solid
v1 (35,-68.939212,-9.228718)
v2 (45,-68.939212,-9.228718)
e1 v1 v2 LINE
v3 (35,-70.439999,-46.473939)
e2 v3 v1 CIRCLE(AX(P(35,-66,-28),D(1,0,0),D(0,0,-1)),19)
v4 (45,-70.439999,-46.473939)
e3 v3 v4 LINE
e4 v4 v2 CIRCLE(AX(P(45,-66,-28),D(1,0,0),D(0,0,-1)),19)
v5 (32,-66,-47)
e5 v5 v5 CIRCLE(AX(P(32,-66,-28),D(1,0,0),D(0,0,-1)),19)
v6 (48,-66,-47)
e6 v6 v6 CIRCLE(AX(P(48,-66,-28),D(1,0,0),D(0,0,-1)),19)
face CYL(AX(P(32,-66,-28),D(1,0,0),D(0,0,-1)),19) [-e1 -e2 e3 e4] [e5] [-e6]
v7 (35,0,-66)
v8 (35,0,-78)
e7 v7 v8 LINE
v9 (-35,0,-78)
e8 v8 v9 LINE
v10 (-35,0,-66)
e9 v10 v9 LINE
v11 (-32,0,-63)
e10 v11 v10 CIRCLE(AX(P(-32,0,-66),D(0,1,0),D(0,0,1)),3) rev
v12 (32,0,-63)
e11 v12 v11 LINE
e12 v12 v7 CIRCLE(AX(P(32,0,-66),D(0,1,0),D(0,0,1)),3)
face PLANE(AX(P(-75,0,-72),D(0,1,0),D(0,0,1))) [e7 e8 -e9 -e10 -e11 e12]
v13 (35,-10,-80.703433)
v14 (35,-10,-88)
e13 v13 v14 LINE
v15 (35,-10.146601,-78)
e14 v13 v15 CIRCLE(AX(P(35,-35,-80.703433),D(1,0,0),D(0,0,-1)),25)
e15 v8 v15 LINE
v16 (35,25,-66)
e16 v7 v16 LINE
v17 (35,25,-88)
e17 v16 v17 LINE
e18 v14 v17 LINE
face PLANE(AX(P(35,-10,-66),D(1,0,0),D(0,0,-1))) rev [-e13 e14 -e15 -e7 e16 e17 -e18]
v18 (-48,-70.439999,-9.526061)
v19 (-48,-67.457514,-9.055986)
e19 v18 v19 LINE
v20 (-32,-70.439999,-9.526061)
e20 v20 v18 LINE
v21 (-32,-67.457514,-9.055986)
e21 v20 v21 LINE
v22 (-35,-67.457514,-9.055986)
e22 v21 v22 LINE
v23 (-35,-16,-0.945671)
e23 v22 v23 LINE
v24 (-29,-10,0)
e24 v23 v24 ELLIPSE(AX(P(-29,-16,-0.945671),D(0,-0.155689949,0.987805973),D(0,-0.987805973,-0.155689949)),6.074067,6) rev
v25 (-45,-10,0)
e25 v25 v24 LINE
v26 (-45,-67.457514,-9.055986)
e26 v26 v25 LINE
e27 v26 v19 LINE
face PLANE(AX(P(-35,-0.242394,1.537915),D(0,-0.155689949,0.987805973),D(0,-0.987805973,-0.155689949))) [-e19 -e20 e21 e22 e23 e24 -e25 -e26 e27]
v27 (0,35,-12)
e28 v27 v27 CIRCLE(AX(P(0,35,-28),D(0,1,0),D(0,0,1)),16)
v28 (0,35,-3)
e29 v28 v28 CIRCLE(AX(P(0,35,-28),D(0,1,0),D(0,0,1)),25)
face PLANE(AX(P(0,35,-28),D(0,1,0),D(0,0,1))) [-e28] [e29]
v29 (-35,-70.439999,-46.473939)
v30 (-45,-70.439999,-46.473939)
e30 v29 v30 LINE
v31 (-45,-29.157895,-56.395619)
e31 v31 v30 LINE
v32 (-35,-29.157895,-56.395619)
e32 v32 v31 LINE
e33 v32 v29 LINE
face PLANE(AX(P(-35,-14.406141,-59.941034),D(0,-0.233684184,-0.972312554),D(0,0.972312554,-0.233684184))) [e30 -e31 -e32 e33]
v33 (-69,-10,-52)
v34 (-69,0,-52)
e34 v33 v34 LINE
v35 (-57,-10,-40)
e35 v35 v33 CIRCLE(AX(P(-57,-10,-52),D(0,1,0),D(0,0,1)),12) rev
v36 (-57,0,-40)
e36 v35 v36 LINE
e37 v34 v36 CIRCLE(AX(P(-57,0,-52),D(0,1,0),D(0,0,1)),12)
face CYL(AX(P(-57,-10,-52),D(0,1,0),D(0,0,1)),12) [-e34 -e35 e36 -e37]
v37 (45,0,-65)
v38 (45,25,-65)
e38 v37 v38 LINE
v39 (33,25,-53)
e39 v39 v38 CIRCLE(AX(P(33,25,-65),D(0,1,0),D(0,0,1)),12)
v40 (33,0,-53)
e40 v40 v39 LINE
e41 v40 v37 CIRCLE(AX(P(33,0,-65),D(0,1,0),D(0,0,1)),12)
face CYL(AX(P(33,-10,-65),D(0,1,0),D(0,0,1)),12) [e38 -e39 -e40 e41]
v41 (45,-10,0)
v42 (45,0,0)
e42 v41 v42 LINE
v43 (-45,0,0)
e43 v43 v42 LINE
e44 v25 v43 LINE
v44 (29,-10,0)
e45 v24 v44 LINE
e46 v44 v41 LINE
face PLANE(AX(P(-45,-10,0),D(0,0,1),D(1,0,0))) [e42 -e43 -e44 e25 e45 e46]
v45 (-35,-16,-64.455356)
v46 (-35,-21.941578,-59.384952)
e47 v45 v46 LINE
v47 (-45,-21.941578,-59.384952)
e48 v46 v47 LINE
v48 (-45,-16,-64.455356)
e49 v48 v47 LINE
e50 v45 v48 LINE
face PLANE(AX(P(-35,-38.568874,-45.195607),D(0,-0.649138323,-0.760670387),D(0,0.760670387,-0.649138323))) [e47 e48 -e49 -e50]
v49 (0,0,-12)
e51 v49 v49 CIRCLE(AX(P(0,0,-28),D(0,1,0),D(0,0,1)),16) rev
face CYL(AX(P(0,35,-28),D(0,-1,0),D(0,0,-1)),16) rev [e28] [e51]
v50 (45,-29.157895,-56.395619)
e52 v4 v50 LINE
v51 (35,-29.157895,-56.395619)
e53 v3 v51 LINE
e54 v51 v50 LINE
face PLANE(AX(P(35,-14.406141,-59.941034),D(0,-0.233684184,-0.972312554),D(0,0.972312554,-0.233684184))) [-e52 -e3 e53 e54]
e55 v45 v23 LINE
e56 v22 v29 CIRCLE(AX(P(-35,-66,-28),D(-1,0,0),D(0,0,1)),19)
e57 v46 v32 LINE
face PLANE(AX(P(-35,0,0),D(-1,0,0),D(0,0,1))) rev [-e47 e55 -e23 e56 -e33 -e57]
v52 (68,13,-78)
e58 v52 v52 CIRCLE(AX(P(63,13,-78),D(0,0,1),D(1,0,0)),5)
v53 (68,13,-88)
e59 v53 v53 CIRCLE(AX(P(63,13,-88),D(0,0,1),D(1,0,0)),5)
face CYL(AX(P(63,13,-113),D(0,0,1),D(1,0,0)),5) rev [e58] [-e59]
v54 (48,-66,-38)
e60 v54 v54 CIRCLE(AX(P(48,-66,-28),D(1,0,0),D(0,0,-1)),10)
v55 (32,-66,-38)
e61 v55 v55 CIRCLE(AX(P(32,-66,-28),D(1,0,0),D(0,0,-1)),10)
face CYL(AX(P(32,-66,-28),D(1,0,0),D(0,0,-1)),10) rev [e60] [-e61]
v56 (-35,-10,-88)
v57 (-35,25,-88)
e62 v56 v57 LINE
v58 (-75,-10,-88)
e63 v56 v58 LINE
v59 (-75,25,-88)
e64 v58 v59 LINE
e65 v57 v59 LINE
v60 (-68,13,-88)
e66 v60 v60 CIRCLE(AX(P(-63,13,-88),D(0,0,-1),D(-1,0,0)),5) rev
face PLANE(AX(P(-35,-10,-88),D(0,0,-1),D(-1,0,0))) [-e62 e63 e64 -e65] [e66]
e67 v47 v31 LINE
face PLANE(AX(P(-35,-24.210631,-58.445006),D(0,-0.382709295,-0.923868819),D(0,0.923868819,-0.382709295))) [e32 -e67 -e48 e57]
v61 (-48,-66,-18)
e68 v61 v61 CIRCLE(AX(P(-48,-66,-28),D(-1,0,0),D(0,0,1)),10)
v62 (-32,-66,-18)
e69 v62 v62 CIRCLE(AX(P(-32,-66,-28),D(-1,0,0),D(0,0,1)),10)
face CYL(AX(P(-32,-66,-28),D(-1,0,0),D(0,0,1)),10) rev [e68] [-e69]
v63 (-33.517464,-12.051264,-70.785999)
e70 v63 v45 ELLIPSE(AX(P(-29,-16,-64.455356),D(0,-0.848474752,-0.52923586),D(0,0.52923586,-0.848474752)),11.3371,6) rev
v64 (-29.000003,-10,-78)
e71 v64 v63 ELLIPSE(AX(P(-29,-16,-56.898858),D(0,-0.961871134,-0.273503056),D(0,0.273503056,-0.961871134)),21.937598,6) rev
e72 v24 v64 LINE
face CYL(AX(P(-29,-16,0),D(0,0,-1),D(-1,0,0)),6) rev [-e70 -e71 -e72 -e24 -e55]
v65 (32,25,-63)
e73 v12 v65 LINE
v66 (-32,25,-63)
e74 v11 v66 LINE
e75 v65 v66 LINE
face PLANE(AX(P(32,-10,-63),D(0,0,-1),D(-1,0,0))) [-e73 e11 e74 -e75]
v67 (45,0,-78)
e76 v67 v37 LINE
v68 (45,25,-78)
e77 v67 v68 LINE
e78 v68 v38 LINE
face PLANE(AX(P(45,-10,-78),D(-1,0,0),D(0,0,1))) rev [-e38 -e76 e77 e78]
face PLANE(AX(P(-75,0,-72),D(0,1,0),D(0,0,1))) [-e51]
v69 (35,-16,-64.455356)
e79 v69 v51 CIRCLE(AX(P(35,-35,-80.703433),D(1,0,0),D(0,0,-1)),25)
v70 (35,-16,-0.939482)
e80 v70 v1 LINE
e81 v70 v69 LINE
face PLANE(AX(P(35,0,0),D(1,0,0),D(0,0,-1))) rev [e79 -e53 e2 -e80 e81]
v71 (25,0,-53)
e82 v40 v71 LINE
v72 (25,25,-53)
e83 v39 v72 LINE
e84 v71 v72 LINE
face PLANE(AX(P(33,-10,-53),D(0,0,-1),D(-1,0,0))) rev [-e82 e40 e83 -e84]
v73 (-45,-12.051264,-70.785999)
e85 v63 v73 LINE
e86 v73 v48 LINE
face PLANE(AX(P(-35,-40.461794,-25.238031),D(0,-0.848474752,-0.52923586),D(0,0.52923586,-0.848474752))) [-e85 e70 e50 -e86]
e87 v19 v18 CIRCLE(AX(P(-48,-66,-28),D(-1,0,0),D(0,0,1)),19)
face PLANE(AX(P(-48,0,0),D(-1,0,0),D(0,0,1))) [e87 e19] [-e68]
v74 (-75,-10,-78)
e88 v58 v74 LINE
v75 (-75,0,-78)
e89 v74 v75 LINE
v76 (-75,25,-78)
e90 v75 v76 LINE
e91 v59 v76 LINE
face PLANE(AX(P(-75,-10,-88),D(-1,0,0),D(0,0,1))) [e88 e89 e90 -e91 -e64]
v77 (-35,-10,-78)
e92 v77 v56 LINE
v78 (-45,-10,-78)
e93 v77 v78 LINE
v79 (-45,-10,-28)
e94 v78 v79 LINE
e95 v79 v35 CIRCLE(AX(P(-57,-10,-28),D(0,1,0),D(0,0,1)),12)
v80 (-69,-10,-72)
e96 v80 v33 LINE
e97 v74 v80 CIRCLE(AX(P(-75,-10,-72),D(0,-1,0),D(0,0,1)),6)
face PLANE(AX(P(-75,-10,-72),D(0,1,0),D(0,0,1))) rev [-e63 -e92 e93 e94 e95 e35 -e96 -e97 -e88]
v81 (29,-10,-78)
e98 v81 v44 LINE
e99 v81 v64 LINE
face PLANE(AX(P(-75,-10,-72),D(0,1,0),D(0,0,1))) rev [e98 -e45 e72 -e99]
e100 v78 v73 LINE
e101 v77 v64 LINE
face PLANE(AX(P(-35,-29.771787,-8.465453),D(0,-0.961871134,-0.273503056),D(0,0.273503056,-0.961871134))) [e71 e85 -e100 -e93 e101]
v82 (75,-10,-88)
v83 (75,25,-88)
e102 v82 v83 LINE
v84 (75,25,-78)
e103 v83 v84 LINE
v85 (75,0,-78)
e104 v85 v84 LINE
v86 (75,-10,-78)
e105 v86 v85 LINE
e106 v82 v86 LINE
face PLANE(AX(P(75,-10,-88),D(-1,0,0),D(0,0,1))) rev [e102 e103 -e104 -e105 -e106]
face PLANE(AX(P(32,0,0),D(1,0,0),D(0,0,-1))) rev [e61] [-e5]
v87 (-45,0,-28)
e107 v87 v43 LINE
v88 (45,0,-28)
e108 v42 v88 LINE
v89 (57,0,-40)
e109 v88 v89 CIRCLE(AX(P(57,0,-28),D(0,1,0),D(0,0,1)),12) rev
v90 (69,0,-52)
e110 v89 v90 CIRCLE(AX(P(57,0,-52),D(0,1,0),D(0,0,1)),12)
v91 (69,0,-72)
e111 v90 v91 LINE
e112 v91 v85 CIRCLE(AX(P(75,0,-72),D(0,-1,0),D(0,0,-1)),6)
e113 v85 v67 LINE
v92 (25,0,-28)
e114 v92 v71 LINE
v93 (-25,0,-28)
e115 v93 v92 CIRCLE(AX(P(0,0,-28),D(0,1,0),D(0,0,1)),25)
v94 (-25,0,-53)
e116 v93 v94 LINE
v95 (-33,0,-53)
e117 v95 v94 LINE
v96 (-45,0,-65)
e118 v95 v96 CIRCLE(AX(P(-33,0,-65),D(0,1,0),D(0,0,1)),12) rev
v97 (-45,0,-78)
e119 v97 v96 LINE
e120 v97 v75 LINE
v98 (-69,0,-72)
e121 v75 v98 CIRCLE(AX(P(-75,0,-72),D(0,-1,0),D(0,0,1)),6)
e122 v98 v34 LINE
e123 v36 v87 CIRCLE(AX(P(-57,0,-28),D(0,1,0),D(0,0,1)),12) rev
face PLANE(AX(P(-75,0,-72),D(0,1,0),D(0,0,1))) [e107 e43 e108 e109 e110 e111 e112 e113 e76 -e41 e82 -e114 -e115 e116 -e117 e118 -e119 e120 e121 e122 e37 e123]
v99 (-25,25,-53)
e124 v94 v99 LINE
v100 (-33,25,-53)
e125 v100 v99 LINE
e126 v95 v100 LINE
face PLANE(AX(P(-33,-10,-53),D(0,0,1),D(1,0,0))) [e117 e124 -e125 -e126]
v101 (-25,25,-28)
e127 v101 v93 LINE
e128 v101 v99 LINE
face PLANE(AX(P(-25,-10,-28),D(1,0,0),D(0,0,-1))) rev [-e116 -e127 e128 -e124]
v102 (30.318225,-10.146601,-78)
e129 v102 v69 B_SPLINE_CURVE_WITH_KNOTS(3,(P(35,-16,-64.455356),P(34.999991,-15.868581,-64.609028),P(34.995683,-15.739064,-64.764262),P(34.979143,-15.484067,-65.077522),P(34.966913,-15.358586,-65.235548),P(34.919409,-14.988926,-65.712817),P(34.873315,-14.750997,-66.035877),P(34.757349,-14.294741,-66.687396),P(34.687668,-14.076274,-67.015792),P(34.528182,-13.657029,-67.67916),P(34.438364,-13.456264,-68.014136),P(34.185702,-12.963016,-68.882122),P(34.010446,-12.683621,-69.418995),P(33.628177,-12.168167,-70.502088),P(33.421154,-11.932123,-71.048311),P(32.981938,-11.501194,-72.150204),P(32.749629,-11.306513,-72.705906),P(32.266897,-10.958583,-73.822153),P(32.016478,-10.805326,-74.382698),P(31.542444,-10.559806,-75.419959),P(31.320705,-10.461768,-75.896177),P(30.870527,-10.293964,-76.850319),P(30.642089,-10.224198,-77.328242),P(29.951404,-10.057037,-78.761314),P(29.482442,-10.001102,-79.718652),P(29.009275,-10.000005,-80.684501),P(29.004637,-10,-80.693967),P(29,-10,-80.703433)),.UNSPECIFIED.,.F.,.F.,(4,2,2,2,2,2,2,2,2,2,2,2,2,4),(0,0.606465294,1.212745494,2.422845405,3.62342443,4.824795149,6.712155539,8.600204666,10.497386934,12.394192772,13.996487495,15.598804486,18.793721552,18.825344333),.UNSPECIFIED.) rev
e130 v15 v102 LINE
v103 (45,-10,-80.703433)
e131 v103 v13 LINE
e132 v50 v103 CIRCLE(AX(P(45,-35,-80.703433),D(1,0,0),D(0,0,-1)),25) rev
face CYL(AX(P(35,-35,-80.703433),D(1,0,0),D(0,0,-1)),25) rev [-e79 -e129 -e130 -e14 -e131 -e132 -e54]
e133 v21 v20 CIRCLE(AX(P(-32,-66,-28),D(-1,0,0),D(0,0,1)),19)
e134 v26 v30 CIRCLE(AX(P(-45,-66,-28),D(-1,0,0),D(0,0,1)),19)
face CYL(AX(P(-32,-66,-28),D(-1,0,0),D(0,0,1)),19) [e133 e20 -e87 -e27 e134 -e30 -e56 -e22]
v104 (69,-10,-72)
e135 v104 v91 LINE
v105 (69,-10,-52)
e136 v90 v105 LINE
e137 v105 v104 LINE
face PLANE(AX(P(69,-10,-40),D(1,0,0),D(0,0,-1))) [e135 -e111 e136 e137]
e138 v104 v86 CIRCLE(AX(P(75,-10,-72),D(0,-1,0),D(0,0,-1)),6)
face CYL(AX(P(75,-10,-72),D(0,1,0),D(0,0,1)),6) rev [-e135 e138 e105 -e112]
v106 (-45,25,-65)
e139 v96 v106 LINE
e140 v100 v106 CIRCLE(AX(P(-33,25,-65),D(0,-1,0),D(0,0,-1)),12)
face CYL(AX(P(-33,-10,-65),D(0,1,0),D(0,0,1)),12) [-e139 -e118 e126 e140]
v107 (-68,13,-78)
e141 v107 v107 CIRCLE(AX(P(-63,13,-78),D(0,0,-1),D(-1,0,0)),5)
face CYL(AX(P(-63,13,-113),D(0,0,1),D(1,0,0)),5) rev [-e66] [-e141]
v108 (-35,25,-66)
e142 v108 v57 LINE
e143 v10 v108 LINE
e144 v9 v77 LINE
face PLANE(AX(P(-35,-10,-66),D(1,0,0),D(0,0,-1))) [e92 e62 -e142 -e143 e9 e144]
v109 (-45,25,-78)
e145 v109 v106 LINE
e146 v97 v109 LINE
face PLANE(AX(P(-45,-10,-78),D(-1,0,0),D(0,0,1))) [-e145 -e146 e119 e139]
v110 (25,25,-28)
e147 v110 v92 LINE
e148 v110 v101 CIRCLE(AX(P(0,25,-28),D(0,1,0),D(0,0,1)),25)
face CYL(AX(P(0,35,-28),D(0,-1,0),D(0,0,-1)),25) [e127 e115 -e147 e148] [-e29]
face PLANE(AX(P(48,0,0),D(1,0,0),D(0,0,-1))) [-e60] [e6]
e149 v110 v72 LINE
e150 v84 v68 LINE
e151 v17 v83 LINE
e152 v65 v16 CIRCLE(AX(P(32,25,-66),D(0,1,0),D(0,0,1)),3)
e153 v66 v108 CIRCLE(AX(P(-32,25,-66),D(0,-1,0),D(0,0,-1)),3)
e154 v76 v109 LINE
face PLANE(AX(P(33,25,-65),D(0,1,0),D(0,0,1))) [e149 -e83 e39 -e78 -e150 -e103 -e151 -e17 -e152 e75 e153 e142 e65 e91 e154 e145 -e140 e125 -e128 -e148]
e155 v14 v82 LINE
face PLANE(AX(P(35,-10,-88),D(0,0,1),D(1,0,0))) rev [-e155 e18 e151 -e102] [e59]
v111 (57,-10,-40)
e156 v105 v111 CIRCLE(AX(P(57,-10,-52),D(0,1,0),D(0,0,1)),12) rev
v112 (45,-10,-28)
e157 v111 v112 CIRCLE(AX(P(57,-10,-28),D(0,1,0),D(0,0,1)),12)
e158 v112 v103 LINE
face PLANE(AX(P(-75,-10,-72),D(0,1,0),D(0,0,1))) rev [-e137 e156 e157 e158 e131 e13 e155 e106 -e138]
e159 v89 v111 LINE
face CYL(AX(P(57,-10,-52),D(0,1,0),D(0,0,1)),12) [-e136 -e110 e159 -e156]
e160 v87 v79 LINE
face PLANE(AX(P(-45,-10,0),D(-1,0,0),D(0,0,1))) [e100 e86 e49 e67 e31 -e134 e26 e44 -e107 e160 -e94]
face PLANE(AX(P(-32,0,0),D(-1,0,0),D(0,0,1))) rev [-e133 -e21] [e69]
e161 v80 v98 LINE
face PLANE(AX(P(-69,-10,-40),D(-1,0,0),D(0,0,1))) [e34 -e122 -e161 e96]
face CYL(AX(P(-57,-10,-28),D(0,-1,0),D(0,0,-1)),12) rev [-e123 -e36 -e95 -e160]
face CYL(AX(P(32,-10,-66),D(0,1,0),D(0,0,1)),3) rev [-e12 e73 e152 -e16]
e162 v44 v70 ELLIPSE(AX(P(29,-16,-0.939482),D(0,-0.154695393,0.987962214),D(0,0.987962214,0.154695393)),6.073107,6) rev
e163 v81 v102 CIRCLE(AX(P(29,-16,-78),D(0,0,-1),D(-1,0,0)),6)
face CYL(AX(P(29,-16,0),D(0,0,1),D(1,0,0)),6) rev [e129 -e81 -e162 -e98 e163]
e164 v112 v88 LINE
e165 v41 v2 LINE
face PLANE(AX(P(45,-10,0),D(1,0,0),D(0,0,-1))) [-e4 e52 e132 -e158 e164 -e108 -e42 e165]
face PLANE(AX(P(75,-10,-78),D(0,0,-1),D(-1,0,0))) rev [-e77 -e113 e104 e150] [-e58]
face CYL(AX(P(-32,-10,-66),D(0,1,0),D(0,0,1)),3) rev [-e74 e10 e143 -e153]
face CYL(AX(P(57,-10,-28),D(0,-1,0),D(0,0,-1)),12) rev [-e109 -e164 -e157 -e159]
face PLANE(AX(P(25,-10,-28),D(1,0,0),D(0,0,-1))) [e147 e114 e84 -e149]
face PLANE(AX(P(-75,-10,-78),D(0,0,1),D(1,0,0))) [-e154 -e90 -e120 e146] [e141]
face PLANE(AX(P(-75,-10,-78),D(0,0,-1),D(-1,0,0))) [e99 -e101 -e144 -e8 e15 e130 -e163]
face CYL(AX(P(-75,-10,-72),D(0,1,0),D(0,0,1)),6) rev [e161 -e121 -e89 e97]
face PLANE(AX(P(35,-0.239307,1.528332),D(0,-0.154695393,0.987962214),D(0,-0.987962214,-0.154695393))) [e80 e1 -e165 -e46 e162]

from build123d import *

# Parameters (mm, degrees)
BOSS_EXTRUDE1_DEPTH = 10
SKETCH2_R           = 25
SKETCH2_R_2         = 16
BOSS_EXTRUDE2_DEPTH = 35
BOSS_EXTRUDE4_START = -45
BOSS_EXTRUDE4_DEPTH = 35
SKETCH4_R           = 5
CUT_EXTRUDE1_DEPTH  = 35
FILLET1_R           = 12
FILLET2_R           = 12
BOSS_EXTRUDE5_START = -5
SKETCH5_R           = 19
SKETCH5_R_2         = 10
BOSS_EXTRUDE5_DEPTH = 8
BOSS_EXTRUDE6_DEPTH = 10
FILLET3_R           = 6
FILLET4_START       = 35
FILLET4_DEPTH       = 10
FILLET4_START_2     = -78
FILLET4_2_DEPTH     = 21.60438079
FILLET4_START_3     = 30.318225383
FILLET4_3_DEPTH     = 4.681774617
BOSS_EXTRUDE7_START = -5
SKETCH7_R           = 10
BOSS_EXTRUDE7_DEPTH = 8
BOSS_EXTRUDE8_START = -10
BOSS_EXTRUDE8_DEPTH = 10
FILLET5_R           = 6


with BuildPart() as part:
    # Sketch1 → Boss-Extrude1 (new body)
    with BuildSketch(Plane(origin=(0, 0, 0), x_dir=(1, 0, 0), z_dir=(0, 1, 0))):
        with BuildLine():
            Line((-45, 0), (45, 0))
            Line((45, 0), (45, 40))
            Line((45, 40), (69, 40))
            Line((69, 40), (69, 72))
            ThreePointArc((69, 72), (70.757359313, 76.242640687), (75, 78))
            Line((75, 78), (-75, 78))
            ThreePointArc((-75, 78), (-70.757359313, 76.242640687), (-69, 72))
            Line((-69, 72), (-69, 40))
            Line((-69, 40), (-45, 40))
            Line((-45, 40), (-45, 0))
        make_face()
    extrude(amount=-BOSS_EXTRUDE1_DEPTH)

    # Sketch2 → Boss-Extrude2 (add)
    with BuildSketch(Plane(origin=(0, 0, 0), x_dir=(1, 0, 0), z_dir=(0, 1, 0))):
        with Locations(Location((0, 28, 0), (0, 0, 270))):
            Circle(SKETCH2_R)
        with Locations(Location((0, 28, 0), (0, 0, 270))):
            Circle(SKETCH2_R_2, mode=Mode.SUBTRACT)
    extrude(amount=BOSS_EXTRUDE2_DEPTH)

    # Sketch3 → Boss-Extrude4 (add)
    with BuildSketch(Plane(origin=(0, 35, 0), x_dir=(1, 0, 0), z_dir=(0, 1, 0)).offset(BOSS_EXTRUDE4_START)):
        with BuildLine():
            Line((32, 63), (-32, 63))
            ThreePointArc((-32, 63), (-34.121320344, 63.878679656), (-35, 66))
            Line((-35, 66), (-35, 88))
            Line((-35, 88), (-75, 88))
            Line((-75, 88), (-75, 78))
            Line((-75, 78), (-45, 78))
            Line((-45, 78), (-45, 65))
            ThreePointArc((-45, 65), (-41.485281374, 56.514718626), (-33, 53))
            Line((-33, 53), (-25, 53))
            Line((-25, 53), (-25, 28))
            ThreePointArc((-25, 28), (0, 53), (25, 28))
            Line((25, 28), (25, 53))
            Line((25, 53), (33, 53))
            ThreePointArc((33, 53), (41.485281374, 56.514718626), (45, 65))
            Line((45, 65), (45, 78))
            Line((45, 78), (75, 78))
            Line((75, 78), (75, 88))
            Line((75, 88), (35, 88))
            Line((35, 88), (35, 66))
            ThreePointArc((35, 66), (34.121320344, 63.878679656), (32, 63))
        make_face()
    extrude(amount=BOSS_EXTRUDE4_DEPTH)

    # Sketch4 → Cut-Extrude1 (cut)
    with BuildSketch(Plane.XY.offset(-78)):
        with Locations((63, 13)):
            Circle(SKETCH4_R)
    cut_extrude1 = extrude(amount=-CUT_EXTRUDE1_DEPTH, mode=Mode.SUBTRACT)

    # Mirror1: Cut-Extrude1 across plane
    add(cut_extrude1.mirror(Plane(origin=(0, 0, 0), x_dir=(0, 0, 1), z_dir=(1, 0, 0))), mode=Mode.SUBTRACT)

    # Fillet1
    fillet1_edges = [part.edges().sort_by_distance(p)[0] for p in [
        (-45, -5, -40),
        (45, -5, -40),
    ]]
    fillet(fillet1_edges, radius=FILLET1_R)

    # Fillet2
    fillet2_edges = [part.edges().sort_by_distance(p)[0] for p in [
        (-69, -5, -40),
        (69, -5, -40),
    ]]
    fillet(fillet2_edges, radius=FILLET2_R - 0.0001)  # a hair under: the kernel refuses the full size



with BuildPart() as body_2:
    # Sketch5 → Boss-Extrude5 (new, symmetric)
    with BuildSketch(Plane(origin=(45, 0, 0), x_dir=(0, 0, -1), z_dir=(1, 0, 0)).offset(BOSS_EXTRUDE5_START)):
        with Locations((28, -66)):
            Circle(SKETCH5_R)
        with Locations((28, -66)):
            Circle(SKETCH5_R_2, mode=Mode.SUBTRACT)
    extrude(amount=BOSS_EXTRUDE5_DEPTH, both=True)


with BuildPart() as part_1:
    add(part.part)

    add(body_2.part)  # Boss-Extrude6 merges body 2
    # Sketch5<3> → Boss-Extrude6 (add)
    with BuildSketch(Plane(origin=(45, 0, 0), x_dir=(0, 0, -1), z_dir=(1, 0, 0))):
        with BuildLine():
            Line((61, -10), (0, -10))
            Line((0, -10), (9.228717941, -68.939212458))
            ThreePointArc((9.228717941, -68.939212458), (26.525951004, -47.057265785), (47, -66))
            ThreePointArc((47, -66), (46.868026287, -68.235527685), (46.473938523, -70.439999487))
            Line((46.473938523, -70.439999487), (61, -10))
        make_face()
    extrude(amount=-BOSS_EXTRUDE6_DEPTH)

    # Fillet3
    fillet3_edges = [part_1.edges().sort_by_distance(p)[0] for p in [
        (35, -10, -30.5),
    ]]
    fillet(fillet3_edges, radius=FILLET3_R)

    # Fillet4: read off the stored shape, not the designer's step
    # Fillet4 outline → Fillet4 (add)
    with BuildSketch(Plane.YZ.offset(FILLET4_START)):
        with BuildLine():
            ThreePointArc((-29.157895412, -56.39561931), (-15.365176157, -65.228495591), (-10, -80.703433157))
            Line((-10, -80.703433157), (-10, -61))
            Line((-10, -61), (-29.157895412, -56.39561931))
        make_face()
    extrude(amount=FILLET4_DEPTH)

    # Fillet4 2 outline → Fillet4 2 (add)
    with BuildSketch(Plane.XY.offset(FILLET4_START_2)):
        with BuildLine():
            ThreePointArc((29, -10), (33.242640687, -11.757359313), (35, -16))
            Line((35, -16), (35, -10))
            Line((35, -10), (29, -10))
        make_face()
    extrude(amount=FILLET4_2_DEPTH)

    # Fillet4 3 outline → Fillet4 3 (cut)
    with BuildSketch(Plane.YZ.offset(FILLET4_START_3)):
        with BuildLine():
            Line((-18, -80), (-10.009898324, -80))
            ThreePointArc((-10.009898324, -80), (-12.047126523, -70.795577731), (-17.3481317, -63))
            Line((-17.3481317, -63), (-18, -63))
            Line((-18, -63), (-18, -80))
        make_face()
    extrude(amount=FILLET4_3_DEPTH, mode=Mode.SUBTRACT)



with BuildPart() as body_2_2:
    # Sketch7 → Boss-Extrude7 (new, symmetric)
    with BuildSketch(Plane.ZY.offset(45).offset(BOSS_EXTRUDE7_START)):
        with BuildLine():
            ThreePointArc((-46.473938523, -70.439999487), (-28, -85), (-9.526061477, -70.439999487))
            Line((-9.526061477, -70.439999487), (-9.055986357, -67.457514009))
            ThreePointArc((-9.055986357, -67.457514009), (-9.014001748, -66.729294447), (-9, -66))
            ThreePointArc((-9, -66), (-30.235527685, -47.131973713), (-46.473938523, -70.439999487))
        make_face()
        with Locations(Location((-28, -66, 0), (0, 0, 180))):
            Circle(SKETCH7_R, mode=Mode.SUBTRACT)
    extrude(amount=BOSS_EXTRUDE7_DEPTH, both=True)


with BuildPart() as part_2:
    add(part_1.part)

    add(body_2_2.part)  # Boss-Extrude8 merges body 2 2
    # Sketch7<3> → Boss-Extrude8 (add)
    with BuildSketch(Plane.ZY.offset(45).offset(BOSS_EXTRUDE8_START)):
        with BuildLine():
            ThreePointArc((-9, -66), (-9.014001748, -66.729294447), (-9.055986357, -67.457514009))
            Line((-9.055986357, -67.457514009), (0, -10))
            Line((0, -10), (-28, -10))
            Line((-28, -10), (-78, -10))
            Line((-78, -10), (-70.785998867, -12.051263714))
            Line((-70.785998867, -12.051263714), (-64.455356347, -16))
            Line((-64.455356347, -16), (-59.38495245, -21.941578182))
            Line((-59.38495245, -21.941578182), (-56.39561931, -29.157895412))
            Line((-56.39561931, -29.157895412), (-46.473938523, -70.439999487))
            ThreePointArc((-46.473938523, -70.439999487), (-30.235527685, -47.131973713), (-9, -66))
        make_face()
    extrude(amount=BOSS_EXTRUDE8_DEPTH)

    # Fillet5
    # the kernel refuses this fillet: 6 mm, written as the material it adds along each edge
    with BuildSketch(Plane(origin=(-35, -10, 0), x_dir=(1, 0, 0), z_dir=(0, 0, -1))) as fillet5_piece_1_section:
        with BuildLine():
            CenterArc((FILLET5_R, FILLET5_R), FILLET5_R, 180, 90)
            Line((0, FILLET5_R), (0, 0))
            Line((0, 0), (FILLET5_R, 0))
        make_face()
    fillet5_piece_1 = extrude(amount=78, mode=Mode.PRIVATE)
    fillet5_piece_1 = split(fillet5_piece_1, bisect_by=Plane(origin=(-35, -10, 0), z_dir=(0, 0.15568994877172856, -0.9878059727757555)), keep=Keep.TOP, mode=Mode.PRIVATE)
    fillet5_piece_1 = split(fillet5_piece_1, bisect_by=Plane(origin=(-35, -30.519826172, -5.834705883), z_dir=(0, 0.9618711340013946, 0.27350305587848817)), keep=Keep.TOP, mode=Mode.PRIVATE)
    fillet5_piece_1 = split(fillet5_piece_1, bisect_by=Plane(origin=(-35, -44.355068521, -40.257803859), z_dir=(0, 0.6491383227373216, 0.7606703871939389)), keep=Keep.TOP, mode=Mode.PRIVATE)
    add(fillet5_piece_1)
    with BuildSketch(Plane(origin=(-35, -10, 0), x_dir=(1, 0, 0), z_dir=(0, 0, -1))) as fillet5_piece_2_section:
        with BuildLine():
            CenterArc((FILLET5_R, FILLET5_R), FILLET5_R, 180, 90)
            Line((0, FILLET5_R), (0, 0))
            Line((0, 0), (FILLET5_R, 0))
        make_face()
    fillet5_piece_2 = extrude(amount=78, mode=Mode.PRIVATE)
    fillet5_piece_2 = split(fillet5_piece_2, bisect_by=Plane(origin=(-35, -30.519826172, -5.834705883), z_dir=(0, -0.9618711340013946, -0.27350305587848817)), keep=Keep.TOP, mode=Mode.PRIVATE)
    fillet5_piece_2 = split(fillet5_piece_2, bisect_by=Plane(origin=(-35, -44.355068521, -40.257803859), z_dir=(0, 0.6491383227373216, 0.7606703871939389)), keep=Keep.TOP, mode=Mode.PRIVATE)
    add(fillet5_piece_2)
    with BuildSketch(Plane(origin=(-35, -10, 0), x_dir=(1, 0, 0), z_dir=(0, 0, -1))) as fillet5_piece_3_section:
        with BuildLine():
            CenterArc((FILLET5_R, FILLET5_R), FILLET5_R, 180, 90)
            Line((0, FILLET5_R), (0, 0))
            Line((0, 0), (FILLET5_R, 0))
        make_face()
    fillet5_piece_3 = extrude(amount=78, mode=Mode.PRIVATE)
    fillet5_piece_3 = split(fillet5_piece_3, bisect_by=Plane(origin=(-35, -30.519826172, -5.834705883), z_dir=(0, 0.9618711340013946, 0.27350305587848817)), keep=Keep.TOP, mode=Mode.PRIVATE)
    fillet5_piece_3 = split(fillet5_piece_3, bisect_by=Plane(origin=(-35, -43.262700092, -20.747598748), z_dir=(0, 0.8484747516990396, 0.5292358602071983)), keep=Keep.TOP, mode=Mode.PRIVATE)
    fillet5_piece_3 = split(fillet5_piece_3, bisect_by=Plane(origin=(-35, -44.355068521, -40.257803859), z_dir=(0, -0.6491383227373216, -0.7606703871939389)), keep=Keep.TOP, mode=Mode.PRIVATE)
    add(fillet5_piece_3)
    with BuildSketch(Plane(origin=(-35, -10, 0), x_dir=(1, 0, 0), z_dir=(0, 0, -1))) as fillet5_piece_4_section:
        with BuildLine():
            CenterArc((FILLET5_R, FILLET5_R), FILLET5_R, 180, 90)
            Line((0, FILLET5_R), (0, 0))
            Line((0, 0), (FILLET5_R, 0))
        make_face()
    fillet5_piece_4 = extrude(amount=78, mode=Mode.PRIVATE)
    fillet5_piece_4 = split(fillet5_piece_4, bisect_by=Plane(origin=(-35, -30.519826172, -5.834705883), z_dir=(0, -0.9618711340013946, -0.27350305587848817)), keep=Keep.TOP, mode=Mode.PRIVATE)
    fillet5_piece_4 = split(fillet5_piece_4, bisect_by=Plane(origin=(-35, -43.262700092, -20.747598748), z_dir=(0, 0.8484747516990396, 0.5292358602071983)), keep=Keep.TOP, mode=Mode.PRIVATE)
    fillet5_piece_4 = split(fillet5_piece_4, bisect_by=Plane(origin=(-35, -44.355068521, -40.257803859), z_dir=(0, -0.6491383227373216, -0.7606703871939389)), keep=Keep.TOP, mode=Mode.PRIVATE)
    add(fillet5_piece_4)
    with BuildSketch(Plane(origin=(-35, -10, 0), x_dir=(1, 0, 0), z_dir=(0, 0, -1))) as fillet5_piece_5_section:
        with BuildLine():
            CenterArc((FILLET5_R, FILLET5_R), FILLET5_R, 180, 90)
            Line((0, FILLET5_R), (0, 0))
            Line((0, 0), (FILLET5_R, 0))
        make_face()
    fillet5_piece_5 = extrude(amount=78, mode=Mode.PRIVATE)
    fillet5_piece_5 = split(fillet5_piece_5, bisect_by=Plane(origin=(-35, -30.519826172, -5.834705883), z_dir=(0, 0.9618711340013946, 0.27350305587848817)), keep=Keep.TOP, mode=Mode.PRIVATE)
    fillet5_piece_5 = split(fillet5_piece_5, bisect_by=Plane(origin=(-35, -43.262700092, -20.747598748), z_dir=(0, -0.8484747516990396, -0.5292358602071983)), keep=Keep.TOP, mode=Mode.PRIVATE)
    add(fillet5_piece_5)


solid = part_2.part
